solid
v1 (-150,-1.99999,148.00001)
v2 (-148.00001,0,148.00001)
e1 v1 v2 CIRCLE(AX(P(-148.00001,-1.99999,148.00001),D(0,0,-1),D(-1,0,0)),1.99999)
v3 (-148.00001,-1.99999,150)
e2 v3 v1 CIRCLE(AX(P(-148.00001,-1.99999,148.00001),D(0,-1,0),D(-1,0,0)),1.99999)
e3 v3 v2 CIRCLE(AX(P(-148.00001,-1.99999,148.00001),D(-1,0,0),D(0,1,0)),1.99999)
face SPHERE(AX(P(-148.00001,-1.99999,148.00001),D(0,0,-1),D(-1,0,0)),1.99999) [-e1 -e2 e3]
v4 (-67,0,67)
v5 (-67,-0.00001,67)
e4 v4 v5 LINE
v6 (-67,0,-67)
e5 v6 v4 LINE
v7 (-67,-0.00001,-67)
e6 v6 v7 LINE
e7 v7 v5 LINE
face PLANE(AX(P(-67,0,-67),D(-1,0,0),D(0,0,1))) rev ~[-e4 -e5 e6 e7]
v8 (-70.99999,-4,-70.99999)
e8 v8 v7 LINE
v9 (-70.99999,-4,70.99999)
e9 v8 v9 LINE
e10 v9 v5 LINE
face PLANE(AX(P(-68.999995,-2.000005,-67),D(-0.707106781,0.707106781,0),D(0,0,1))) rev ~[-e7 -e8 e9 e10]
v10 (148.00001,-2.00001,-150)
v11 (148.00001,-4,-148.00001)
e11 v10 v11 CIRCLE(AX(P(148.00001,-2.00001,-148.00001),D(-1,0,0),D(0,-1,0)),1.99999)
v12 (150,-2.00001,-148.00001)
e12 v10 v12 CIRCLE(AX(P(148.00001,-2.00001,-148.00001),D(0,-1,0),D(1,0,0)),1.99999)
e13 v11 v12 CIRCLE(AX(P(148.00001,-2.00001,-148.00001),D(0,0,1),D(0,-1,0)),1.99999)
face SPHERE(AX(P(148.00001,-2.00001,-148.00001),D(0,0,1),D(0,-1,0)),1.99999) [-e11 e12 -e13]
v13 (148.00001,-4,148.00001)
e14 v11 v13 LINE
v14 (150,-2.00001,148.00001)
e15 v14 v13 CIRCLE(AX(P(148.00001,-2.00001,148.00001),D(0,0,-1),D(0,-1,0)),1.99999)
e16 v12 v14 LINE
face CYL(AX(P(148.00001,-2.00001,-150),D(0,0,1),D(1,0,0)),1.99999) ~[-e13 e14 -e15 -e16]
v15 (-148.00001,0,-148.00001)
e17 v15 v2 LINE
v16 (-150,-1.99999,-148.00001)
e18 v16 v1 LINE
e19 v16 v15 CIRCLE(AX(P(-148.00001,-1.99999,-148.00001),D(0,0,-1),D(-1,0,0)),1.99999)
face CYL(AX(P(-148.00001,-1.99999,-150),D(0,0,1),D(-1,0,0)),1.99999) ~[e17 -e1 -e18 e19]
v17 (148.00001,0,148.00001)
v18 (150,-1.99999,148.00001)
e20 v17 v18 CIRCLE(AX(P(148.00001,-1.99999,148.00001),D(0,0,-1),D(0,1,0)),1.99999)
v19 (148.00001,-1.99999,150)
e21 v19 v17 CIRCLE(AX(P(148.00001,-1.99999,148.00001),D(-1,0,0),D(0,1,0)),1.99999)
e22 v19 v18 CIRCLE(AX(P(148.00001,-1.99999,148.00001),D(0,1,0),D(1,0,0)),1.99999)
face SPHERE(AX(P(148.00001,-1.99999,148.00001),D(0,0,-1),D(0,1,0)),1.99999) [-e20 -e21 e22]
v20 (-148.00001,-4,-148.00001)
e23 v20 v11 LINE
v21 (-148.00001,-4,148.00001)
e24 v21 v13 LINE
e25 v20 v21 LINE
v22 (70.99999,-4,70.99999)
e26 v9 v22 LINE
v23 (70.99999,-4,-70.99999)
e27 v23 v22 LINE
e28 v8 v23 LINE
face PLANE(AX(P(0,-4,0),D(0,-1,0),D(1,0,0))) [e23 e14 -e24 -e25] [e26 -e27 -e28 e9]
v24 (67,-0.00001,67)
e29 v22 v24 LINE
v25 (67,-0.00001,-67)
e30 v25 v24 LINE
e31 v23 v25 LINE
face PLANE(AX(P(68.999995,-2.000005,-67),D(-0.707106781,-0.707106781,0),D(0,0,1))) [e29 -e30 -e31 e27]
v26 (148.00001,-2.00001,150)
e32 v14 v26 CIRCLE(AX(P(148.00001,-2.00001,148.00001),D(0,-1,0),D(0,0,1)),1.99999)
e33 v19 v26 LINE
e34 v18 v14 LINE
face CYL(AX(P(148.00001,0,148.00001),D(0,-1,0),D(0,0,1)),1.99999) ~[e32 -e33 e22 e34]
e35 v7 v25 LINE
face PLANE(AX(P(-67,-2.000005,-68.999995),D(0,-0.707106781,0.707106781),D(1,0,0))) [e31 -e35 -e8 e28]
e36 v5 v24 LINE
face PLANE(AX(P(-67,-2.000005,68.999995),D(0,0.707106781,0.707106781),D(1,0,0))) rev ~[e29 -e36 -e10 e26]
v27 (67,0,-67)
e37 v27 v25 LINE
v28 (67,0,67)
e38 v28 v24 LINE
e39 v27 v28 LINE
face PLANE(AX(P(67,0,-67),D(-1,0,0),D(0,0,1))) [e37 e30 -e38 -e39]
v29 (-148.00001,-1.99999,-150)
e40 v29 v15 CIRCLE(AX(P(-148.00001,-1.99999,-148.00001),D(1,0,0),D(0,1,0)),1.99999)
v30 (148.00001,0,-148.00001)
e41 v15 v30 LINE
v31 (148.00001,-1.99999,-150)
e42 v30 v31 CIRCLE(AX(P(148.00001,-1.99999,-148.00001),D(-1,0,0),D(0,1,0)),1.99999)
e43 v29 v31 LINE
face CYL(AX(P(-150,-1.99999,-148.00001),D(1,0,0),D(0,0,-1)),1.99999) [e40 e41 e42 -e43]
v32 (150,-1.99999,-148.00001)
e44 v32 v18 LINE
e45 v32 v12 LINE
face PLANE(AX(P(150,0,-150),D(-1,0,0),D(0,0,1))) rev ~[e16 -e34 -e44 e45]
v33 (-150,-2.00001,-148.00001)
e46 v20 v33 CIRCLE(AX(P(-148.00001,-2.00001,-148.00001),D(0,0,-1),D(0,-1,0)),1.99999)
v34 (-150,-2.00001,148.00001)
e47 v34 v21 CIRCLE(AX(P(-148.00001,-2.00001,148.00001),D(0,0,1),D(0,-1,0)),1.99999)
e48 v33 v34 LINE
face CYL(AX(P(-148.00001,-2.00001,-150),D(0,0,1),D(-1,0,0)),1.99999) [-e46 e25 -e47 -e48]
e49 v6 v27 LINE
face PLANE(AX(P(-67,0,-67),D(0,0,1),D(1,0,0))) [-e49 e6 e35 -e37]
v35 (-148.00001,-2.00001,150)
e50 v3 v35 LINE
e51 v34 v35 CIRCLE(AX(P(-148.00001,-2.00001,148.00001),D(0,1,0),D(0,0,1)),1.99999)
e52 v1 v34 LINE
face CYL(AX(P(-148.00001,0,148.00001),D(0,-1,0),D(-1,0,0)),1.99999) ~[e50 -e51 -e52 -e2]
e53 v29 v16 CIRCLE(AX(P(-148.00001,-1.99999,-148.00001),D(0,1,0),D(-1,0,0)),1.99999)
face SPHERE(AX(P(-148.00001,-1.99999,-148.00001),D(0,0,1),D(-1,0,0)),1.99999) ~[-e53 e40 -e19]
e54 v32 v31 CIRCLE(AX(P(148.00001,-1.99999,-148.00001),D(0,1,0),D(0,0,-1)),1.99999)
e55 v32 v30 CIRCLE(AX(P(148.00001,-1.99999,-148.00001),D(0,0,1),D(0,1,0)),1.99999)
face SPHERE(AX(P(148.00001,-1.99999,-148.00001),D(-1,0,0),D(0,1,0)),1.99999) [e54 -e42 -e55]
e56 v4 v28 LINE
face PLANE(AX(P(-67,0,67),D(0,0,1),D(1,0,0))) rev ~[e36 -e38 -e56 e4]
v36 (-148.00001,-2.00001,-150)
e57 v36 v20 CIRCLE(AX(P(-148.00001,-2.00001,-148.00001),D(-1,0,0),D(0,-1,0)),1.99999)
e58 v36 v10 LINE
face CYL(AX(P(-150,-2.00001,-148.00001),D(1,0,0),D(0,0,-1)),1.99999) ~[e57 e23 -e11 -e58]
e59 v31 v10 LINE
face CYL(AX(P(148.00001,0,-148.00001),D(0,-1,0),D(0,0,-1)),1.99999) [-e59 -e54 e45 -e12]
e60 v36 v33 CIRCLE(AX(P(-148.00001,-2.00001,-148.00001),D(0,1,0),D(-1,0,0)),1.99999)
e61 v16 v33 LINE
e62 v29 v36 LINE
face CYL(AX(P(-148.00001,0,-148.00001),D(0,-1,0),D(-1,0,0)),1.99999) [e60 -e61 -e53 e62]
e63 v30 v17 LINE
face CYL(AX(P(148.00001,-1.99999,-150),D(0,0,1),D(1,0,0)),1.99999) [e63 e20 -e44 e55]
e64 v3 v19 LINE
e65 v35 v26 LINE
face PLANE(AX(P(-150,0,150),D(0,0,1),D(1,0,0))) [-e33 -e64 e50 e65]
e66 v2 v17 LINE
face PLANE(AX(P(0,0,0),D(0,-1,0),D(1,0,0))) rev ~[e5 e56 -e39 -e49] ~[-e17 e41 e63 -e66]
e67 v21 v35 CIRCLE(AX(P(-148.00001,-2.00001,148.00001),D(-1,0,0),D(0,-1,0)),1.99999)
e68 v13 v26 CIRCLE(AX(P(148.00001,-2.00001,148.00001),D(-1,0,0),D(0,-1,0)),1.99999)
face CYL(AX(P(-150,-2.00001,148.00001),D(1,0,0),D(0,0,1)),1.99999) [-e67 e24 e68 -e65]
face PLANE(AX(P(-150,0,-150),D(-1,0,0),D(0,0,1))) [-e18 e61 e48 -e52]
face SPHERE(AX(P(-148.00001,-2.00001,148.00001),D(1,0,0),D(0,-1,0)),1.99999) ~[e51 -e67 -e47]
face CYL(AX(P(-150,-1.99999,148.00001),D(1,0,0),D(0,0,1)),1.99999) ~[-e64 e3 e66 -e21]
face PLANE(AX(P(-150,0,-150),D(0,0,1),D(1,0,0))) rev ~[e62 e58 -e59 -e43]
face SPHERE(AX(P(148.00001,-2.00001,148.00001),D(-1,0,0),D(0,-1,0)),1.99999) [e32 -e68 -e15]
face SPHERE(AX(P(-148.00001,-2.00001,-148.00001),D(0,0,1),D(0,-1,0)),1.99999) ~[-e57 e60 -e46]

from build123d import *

# Parameters (mm, degrees)
F0_W     = 300
F0_H     = 300
F0_W_2   = 134
F0_H_2   = 134
F1_DEPTH = 4
F2_R     = 1.99999
F3_SIZE  = 3.99999


# Not quite as in the source:
# - a fillet or chamfer is up to 0.001 mm smaller than in the source, because OpenCascade refuses the exact size


with BuildPart() as f1:
    # F0 (on Front) → F1 (new body)
    with BuildSketch(Plane.XZ):
        Rectangle(F0_W, F0_H)
        Rectangle(F0_W_2, F0_H_2, mode=Mode.SUBTRACT)
    extrude(amount=F1_DEPTH)

    # F2 (radius 2 in the source; OpenCascade refuses exactly that, so slightly less here)
    f2_edges = [f1.edges().sort_by_distance(p)[0] for p in [
        (0, -4, 150),
        (-150, -4, 0),
        (150, -4, 0),
        (0, -4, -150),
        (-150, 0, 0),
        (-150, -2, 150),
        (-150, -2, -150),
        (0, 0, -150),
        (150, 0, 0),
        (0, 0, 150),
        (150, -2, 150),
        (150, -2, -150),
    ]]
    fillet(f2_edges, radius=F2_R)

    # F3 (size 4 in the source; OpenCascade refuses exactly that, so slightly less here)
    f3_edges = [f1.edges().sort_by_distance(p)[0] for p in [
        (0, -4, 67),
        (67, -4, 0),
        (0, -4, -67),
        (-67, -4, 0),
    ]]
    chamfer(f3_edges, length=F3_SIZE)


solid = f1.part
